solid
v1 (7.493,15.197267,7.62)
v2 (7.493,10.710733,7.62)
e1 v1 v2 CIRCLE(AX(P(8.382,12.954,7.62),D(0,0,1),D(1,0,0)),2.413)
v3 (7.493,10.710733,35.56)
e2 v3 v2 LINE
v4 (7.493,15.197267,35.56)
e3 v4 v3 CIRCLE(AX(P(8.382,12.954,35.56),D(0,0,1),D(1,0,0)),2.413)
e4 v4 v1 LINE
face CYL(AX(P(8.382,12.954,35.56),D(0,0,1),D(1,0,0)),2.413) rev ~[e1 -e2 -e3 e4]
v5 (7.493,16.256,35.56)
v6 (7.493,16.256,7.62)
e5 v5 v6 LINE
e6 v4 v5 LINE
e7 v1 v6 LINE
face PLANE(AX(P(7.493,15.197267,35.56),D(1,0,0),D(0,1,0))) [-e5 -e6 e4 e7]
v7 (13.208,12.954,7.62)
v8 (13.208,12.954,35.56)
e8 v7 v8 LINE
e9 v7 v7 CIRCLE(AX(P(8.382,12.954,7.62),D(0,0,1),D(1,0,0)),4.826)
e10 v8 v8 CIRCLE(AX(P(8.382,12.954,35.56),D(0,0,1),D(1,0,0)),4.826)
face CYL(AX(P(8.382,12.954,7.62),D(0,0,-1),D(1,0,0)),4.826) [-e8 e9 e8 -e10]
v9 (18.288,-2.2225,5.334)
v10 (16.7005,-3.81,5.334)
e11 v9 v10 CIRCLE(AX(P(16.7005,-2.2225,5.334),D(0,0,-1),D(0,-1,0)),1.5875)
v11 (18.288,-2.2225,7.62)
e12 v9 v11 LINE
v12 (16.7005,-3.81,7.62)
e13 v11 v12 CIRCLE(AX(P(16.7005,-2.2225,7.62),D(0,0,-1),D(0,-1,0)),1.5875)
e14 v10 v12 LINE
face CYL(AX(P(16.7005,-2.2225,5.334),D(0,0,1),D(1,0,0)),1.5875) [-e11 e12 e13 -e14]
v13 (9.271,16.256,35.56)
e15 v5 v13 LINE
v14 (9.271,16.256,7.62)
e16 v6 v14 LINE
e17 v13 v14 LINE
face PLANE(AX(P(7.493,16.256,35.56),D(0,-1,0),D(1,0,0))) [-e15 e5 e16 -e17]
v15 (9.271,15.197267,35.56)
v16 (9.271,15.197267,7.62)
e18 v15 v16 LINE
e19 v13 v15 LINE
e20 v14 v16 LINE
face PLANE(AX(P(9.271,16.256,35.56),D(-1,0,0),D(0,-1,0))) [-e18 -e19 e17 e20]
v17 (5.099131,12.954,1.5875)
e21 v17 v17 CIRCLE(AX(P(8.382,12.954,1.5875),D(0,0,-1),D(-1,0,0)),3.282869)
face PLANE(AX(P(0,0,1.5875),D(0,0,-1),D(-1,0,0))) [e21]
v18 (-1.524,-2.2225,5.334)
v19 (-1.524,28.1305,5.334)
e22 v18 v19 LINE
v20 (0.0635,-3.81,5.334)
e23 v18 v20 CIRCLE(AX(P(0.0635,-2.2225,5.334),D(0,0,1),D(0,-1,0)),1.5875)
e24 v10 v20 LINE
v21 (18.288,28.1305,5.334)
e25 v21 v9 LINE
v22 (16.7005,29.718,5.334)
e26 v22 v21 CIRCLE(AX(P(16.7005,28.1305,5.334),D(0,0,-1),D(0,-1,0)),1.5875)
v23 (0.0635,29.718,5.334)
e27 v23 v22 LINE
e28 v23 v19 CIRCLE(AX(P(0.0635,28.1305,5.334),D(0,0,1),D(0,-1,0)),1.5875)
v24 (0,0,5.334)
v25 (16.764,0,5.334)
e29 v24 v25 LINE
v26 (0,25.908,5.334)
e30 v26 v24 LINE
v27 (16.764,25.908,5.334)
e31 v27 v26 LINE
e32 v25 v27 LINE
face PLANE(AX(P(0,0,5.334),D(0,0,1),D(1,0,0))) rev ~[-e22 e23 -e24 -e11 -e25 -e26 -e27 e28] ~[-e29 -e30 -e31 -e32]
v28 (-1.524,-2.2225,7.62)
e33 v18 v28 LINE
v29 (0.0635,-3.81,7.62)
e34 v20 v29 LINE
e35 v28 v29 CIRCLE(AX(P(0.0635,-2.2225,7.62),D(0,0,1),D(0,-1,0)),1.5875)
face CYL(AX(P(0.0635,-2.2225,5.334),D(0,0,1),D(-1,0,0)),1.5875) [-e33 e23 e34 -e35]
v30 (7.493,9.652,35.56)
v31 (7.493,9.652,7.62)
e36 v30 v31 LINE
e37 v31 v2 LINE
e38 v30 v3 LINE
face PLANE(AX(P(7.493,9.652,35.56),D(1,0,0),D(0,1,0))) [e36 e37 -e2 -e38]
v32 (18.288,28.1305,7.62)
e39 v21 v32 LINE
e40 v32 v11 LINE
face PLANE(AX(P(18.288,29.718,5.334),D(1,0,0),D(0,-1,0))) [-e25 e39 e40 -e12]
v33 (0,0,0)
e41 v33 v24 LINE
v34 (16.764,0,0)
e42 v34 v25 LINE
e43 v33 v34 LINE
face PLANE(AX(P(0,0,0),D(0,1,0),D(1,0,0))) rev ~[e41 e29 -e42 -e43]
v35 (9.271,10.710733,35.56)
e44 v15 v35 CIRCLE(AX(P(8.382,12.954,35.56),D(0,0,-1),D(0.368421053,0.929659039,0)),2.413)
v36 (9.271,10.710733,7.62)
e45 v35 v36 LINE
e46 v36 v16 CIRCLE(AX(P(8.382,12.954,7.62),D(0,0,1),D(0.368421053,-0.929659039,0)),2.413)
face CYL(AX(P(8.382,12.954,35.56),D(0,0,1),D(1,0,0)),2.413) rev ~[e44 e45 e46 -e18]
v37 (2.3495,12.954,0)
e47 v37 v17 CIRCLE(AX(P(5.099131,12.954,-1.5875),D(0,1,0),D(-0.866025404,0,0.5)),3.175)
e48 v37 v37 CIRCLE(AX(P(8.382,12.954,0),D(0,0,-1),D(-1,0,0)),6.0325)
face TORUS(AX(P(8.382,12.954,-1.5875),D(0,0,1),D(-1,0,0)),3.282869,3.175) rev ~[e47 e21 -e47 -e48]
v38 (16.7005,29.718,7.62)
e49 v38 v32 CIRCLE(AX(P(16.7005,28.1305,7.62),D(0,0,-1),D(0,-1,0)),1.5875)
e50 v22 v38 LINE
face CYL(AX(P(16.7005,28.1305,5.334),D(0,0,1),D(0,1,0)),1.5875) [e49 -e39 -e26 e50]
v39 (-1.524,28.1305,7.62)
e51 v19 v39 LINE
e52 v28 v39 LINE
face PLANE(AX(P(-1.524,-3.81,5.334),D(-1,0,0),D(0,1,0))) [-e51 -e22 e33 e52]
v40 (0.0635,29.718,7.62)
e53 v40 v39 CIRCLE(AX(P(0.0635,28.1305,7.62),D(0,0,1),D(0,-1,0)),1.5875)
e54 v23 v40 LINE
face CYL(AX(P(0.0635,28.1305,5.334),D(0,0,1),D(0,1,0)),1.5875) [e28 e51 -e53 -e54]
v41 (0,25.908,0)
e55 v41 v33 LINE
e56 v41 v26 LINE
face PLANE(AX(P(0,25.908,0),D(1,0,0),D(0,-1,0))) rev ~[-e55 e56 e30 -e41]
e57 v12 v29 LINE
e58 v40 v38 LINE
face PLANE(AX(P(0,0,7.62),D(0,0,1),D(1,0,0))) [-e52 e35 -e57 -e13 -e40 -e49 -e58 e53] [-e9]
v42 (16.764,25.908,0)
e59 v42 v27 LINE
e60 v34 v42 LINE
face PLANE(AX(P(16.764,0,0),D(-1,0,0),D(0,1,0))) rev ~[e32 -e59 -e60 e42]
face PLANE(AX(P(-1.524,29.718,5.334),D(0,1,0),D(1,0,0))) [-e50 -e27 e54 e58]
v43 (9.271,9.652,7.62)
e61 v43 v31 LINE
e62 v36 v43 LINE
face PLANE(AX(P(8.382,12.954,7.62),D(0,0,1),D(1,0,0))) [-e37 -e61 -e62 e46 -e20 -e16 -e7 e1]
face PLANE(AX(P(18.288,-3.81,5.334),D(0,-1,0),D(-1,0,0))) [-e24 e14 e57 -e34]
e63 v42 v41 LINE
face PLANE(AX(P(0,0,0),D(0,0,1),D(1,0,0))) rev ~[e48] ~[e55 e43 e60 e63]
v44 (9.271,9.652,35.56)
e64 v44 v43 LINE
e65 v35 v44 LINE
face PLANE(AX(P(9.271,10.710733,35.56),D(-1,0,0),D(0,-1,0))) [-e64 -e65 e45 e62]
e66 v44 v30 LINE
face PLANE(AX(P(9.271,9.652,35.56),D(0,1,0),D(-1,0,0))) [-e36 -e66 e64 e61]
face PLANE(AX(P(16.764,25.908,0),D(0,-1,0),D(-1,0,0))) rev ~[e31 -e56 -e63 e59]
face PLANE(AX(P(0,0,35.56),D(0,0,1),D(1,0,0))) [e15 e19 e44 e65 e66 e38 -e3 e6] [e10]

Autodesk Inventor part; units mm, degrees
ref_plane "YZ Plane" through (0, 0, 0) normal (1, 0, 0) x (0, 1, 0)
ref_plane "XZ Plane" through (0, 0, 0) normal (0, 1, 0) x (-1, 0, 0)
ref_plane "XY Plane" through (0, 0, 0) normal (0, 0, 1) x (1, 0, 0)
sketch "Sketch1" plane through (0, 0, 0) normal (0, 0, 1) x (1, 0, 0)
  line L0 (0, 0) -> (16.764, 0)
  line L1 (16.764, 0) -> (16.764, 25.908)
  line L2 (16.764, 25.908) -> (0, 25.908)
  line L3 (0, 25.908) -> (0, 0)
  dimension "d0" = 16.764
  dimension "d1" = 25.908
extrude "Extrusion1" add sketch "Sketch1" along normal blind 5.334
sketch "Sketch2" plane through (0, 0, 5.334) normal (0, 0, 1) x (1, 0, 0)
  line L0 (-1.524, 29.718) -> (18.288, 29.718)
  line L1 (18.288, 29.718) -> (18.288, -3.81)
  line L2 (18.288, -3.81) -> (-1.524, -3.81)
  line L3 (-1.524, -3.81) -> (-1.524, 29.718)
  line L4 (16.764, 25.908) -> (0, 25.908) projected
  line L5 (0, 0) -> (16.764, 0) projected
  line L6 (0, 25.908) -> (0, 0) projected
  line L7 (16.764, 0) -> (16.764, 25.908) projected
  dimension "d4" = 3.81
  dimension "d5" = 3.81
  dimension "d6" = 1.524
  dimension "d7" = 1.524
extrude "Extrusion2" add sketch "Sketch2" along normal blind 2.286 contours L0 L1 L2 L3 | L7 L5 L6 L4
sketch "Sketch3" plane through (0, 0, 7.62) normal (0, 0, 1) x (1, 0, 0)
  circle A0 centre (8.382, 12.954) radius 4.826
  line L0 (18.288, 29.718) -> (-1.524, 29.718) projected
  line L1 (-1.524, -3.81) -> (18.288, -3.81) projected
  line L2 (-1.524, 29.718) -> (-1.524, -3.81) projected
  line L3 (18.288, -3.81) -> (18.288, 29.718) projected
  point P0 (0, 0)
  dimension "d10" = 16.764
  dimension "d11" = 16.764
  dimension "d12" = 9.906
  dimension "d13" = 9.906
  dimension "d14" = 9.652
extrude "Extrusion3" add sketch "Sketch3" along normal blind 27.94 contours A0
sketch "Sketch4" plane through (8.382, 12.954, 35.56) normal (0, 0, 1) x (1, 0, 0)
  circle A0 centre (0, 0) radius 2.413
  line L0 (-0.889, 3.302) -> (0.889, 3.302)
  line L1 (0.889, 3.302) -> (0.889, -3.302)
  line L2 (0.889, -3.302) -> (-0.889, -3.302)
  line L3 (-0.889, -3.302) -> (-0.889, 3.302)
  circle A1 centre (0, 0) radius 4.826 projected
  point P0 (-8.382, -12.954)
  point P1 (-0.889, 0)
  point P2 (0.889, 0)
  point P3 (-0.889, -2.2433)
  point P4 (0.889, -2.2433)
  point P5 (0.889, 2.2433)
  point P6 (-0.889, 2.2433)
  dimension "d17" = 4.826
  dimension "d18" = 0.889
  dimension "d19" = 0.889
  dimension "d20" = 3.302
  dimension "d21" = 3.302
extrude "Extrusion4" cut sketch "Sketch4" against normal blind 27.94 contours A0 L1 | L1 A0 L3 | A0 L3 L0 L1 | L1 L2 L3 A0 | L3 A0
sketch "Sketch5" plane through (0, 0, 0) normal (0, 0, -1) x (-1, 0, 0)
  arc A0 (-7.493, 10.7107) -> (-7.493, 15.1973) centre (-8.382, 12.954) ccw projected
  circle A1 centre (-8.382, 12.954) radius 6.0325
  point P0 (0, 0)
  dimension "d24" = 12.065
extrude "Extrusion5" cut sketch "Sketch5" against normal blind 1.5875
fillet "Fillet1" radius 3.175 1 edges at (14.4145, 12.954, 1.5875)
fillet "Fillet3" radius 1.5875 4 edges at (-1.524, 29.718, 6.477) (-1.524, -3.81, 6.477) (18.288, 29.718, 6.477) (18.288, -3.81, 6.477)
properties part number "reset_switch"
